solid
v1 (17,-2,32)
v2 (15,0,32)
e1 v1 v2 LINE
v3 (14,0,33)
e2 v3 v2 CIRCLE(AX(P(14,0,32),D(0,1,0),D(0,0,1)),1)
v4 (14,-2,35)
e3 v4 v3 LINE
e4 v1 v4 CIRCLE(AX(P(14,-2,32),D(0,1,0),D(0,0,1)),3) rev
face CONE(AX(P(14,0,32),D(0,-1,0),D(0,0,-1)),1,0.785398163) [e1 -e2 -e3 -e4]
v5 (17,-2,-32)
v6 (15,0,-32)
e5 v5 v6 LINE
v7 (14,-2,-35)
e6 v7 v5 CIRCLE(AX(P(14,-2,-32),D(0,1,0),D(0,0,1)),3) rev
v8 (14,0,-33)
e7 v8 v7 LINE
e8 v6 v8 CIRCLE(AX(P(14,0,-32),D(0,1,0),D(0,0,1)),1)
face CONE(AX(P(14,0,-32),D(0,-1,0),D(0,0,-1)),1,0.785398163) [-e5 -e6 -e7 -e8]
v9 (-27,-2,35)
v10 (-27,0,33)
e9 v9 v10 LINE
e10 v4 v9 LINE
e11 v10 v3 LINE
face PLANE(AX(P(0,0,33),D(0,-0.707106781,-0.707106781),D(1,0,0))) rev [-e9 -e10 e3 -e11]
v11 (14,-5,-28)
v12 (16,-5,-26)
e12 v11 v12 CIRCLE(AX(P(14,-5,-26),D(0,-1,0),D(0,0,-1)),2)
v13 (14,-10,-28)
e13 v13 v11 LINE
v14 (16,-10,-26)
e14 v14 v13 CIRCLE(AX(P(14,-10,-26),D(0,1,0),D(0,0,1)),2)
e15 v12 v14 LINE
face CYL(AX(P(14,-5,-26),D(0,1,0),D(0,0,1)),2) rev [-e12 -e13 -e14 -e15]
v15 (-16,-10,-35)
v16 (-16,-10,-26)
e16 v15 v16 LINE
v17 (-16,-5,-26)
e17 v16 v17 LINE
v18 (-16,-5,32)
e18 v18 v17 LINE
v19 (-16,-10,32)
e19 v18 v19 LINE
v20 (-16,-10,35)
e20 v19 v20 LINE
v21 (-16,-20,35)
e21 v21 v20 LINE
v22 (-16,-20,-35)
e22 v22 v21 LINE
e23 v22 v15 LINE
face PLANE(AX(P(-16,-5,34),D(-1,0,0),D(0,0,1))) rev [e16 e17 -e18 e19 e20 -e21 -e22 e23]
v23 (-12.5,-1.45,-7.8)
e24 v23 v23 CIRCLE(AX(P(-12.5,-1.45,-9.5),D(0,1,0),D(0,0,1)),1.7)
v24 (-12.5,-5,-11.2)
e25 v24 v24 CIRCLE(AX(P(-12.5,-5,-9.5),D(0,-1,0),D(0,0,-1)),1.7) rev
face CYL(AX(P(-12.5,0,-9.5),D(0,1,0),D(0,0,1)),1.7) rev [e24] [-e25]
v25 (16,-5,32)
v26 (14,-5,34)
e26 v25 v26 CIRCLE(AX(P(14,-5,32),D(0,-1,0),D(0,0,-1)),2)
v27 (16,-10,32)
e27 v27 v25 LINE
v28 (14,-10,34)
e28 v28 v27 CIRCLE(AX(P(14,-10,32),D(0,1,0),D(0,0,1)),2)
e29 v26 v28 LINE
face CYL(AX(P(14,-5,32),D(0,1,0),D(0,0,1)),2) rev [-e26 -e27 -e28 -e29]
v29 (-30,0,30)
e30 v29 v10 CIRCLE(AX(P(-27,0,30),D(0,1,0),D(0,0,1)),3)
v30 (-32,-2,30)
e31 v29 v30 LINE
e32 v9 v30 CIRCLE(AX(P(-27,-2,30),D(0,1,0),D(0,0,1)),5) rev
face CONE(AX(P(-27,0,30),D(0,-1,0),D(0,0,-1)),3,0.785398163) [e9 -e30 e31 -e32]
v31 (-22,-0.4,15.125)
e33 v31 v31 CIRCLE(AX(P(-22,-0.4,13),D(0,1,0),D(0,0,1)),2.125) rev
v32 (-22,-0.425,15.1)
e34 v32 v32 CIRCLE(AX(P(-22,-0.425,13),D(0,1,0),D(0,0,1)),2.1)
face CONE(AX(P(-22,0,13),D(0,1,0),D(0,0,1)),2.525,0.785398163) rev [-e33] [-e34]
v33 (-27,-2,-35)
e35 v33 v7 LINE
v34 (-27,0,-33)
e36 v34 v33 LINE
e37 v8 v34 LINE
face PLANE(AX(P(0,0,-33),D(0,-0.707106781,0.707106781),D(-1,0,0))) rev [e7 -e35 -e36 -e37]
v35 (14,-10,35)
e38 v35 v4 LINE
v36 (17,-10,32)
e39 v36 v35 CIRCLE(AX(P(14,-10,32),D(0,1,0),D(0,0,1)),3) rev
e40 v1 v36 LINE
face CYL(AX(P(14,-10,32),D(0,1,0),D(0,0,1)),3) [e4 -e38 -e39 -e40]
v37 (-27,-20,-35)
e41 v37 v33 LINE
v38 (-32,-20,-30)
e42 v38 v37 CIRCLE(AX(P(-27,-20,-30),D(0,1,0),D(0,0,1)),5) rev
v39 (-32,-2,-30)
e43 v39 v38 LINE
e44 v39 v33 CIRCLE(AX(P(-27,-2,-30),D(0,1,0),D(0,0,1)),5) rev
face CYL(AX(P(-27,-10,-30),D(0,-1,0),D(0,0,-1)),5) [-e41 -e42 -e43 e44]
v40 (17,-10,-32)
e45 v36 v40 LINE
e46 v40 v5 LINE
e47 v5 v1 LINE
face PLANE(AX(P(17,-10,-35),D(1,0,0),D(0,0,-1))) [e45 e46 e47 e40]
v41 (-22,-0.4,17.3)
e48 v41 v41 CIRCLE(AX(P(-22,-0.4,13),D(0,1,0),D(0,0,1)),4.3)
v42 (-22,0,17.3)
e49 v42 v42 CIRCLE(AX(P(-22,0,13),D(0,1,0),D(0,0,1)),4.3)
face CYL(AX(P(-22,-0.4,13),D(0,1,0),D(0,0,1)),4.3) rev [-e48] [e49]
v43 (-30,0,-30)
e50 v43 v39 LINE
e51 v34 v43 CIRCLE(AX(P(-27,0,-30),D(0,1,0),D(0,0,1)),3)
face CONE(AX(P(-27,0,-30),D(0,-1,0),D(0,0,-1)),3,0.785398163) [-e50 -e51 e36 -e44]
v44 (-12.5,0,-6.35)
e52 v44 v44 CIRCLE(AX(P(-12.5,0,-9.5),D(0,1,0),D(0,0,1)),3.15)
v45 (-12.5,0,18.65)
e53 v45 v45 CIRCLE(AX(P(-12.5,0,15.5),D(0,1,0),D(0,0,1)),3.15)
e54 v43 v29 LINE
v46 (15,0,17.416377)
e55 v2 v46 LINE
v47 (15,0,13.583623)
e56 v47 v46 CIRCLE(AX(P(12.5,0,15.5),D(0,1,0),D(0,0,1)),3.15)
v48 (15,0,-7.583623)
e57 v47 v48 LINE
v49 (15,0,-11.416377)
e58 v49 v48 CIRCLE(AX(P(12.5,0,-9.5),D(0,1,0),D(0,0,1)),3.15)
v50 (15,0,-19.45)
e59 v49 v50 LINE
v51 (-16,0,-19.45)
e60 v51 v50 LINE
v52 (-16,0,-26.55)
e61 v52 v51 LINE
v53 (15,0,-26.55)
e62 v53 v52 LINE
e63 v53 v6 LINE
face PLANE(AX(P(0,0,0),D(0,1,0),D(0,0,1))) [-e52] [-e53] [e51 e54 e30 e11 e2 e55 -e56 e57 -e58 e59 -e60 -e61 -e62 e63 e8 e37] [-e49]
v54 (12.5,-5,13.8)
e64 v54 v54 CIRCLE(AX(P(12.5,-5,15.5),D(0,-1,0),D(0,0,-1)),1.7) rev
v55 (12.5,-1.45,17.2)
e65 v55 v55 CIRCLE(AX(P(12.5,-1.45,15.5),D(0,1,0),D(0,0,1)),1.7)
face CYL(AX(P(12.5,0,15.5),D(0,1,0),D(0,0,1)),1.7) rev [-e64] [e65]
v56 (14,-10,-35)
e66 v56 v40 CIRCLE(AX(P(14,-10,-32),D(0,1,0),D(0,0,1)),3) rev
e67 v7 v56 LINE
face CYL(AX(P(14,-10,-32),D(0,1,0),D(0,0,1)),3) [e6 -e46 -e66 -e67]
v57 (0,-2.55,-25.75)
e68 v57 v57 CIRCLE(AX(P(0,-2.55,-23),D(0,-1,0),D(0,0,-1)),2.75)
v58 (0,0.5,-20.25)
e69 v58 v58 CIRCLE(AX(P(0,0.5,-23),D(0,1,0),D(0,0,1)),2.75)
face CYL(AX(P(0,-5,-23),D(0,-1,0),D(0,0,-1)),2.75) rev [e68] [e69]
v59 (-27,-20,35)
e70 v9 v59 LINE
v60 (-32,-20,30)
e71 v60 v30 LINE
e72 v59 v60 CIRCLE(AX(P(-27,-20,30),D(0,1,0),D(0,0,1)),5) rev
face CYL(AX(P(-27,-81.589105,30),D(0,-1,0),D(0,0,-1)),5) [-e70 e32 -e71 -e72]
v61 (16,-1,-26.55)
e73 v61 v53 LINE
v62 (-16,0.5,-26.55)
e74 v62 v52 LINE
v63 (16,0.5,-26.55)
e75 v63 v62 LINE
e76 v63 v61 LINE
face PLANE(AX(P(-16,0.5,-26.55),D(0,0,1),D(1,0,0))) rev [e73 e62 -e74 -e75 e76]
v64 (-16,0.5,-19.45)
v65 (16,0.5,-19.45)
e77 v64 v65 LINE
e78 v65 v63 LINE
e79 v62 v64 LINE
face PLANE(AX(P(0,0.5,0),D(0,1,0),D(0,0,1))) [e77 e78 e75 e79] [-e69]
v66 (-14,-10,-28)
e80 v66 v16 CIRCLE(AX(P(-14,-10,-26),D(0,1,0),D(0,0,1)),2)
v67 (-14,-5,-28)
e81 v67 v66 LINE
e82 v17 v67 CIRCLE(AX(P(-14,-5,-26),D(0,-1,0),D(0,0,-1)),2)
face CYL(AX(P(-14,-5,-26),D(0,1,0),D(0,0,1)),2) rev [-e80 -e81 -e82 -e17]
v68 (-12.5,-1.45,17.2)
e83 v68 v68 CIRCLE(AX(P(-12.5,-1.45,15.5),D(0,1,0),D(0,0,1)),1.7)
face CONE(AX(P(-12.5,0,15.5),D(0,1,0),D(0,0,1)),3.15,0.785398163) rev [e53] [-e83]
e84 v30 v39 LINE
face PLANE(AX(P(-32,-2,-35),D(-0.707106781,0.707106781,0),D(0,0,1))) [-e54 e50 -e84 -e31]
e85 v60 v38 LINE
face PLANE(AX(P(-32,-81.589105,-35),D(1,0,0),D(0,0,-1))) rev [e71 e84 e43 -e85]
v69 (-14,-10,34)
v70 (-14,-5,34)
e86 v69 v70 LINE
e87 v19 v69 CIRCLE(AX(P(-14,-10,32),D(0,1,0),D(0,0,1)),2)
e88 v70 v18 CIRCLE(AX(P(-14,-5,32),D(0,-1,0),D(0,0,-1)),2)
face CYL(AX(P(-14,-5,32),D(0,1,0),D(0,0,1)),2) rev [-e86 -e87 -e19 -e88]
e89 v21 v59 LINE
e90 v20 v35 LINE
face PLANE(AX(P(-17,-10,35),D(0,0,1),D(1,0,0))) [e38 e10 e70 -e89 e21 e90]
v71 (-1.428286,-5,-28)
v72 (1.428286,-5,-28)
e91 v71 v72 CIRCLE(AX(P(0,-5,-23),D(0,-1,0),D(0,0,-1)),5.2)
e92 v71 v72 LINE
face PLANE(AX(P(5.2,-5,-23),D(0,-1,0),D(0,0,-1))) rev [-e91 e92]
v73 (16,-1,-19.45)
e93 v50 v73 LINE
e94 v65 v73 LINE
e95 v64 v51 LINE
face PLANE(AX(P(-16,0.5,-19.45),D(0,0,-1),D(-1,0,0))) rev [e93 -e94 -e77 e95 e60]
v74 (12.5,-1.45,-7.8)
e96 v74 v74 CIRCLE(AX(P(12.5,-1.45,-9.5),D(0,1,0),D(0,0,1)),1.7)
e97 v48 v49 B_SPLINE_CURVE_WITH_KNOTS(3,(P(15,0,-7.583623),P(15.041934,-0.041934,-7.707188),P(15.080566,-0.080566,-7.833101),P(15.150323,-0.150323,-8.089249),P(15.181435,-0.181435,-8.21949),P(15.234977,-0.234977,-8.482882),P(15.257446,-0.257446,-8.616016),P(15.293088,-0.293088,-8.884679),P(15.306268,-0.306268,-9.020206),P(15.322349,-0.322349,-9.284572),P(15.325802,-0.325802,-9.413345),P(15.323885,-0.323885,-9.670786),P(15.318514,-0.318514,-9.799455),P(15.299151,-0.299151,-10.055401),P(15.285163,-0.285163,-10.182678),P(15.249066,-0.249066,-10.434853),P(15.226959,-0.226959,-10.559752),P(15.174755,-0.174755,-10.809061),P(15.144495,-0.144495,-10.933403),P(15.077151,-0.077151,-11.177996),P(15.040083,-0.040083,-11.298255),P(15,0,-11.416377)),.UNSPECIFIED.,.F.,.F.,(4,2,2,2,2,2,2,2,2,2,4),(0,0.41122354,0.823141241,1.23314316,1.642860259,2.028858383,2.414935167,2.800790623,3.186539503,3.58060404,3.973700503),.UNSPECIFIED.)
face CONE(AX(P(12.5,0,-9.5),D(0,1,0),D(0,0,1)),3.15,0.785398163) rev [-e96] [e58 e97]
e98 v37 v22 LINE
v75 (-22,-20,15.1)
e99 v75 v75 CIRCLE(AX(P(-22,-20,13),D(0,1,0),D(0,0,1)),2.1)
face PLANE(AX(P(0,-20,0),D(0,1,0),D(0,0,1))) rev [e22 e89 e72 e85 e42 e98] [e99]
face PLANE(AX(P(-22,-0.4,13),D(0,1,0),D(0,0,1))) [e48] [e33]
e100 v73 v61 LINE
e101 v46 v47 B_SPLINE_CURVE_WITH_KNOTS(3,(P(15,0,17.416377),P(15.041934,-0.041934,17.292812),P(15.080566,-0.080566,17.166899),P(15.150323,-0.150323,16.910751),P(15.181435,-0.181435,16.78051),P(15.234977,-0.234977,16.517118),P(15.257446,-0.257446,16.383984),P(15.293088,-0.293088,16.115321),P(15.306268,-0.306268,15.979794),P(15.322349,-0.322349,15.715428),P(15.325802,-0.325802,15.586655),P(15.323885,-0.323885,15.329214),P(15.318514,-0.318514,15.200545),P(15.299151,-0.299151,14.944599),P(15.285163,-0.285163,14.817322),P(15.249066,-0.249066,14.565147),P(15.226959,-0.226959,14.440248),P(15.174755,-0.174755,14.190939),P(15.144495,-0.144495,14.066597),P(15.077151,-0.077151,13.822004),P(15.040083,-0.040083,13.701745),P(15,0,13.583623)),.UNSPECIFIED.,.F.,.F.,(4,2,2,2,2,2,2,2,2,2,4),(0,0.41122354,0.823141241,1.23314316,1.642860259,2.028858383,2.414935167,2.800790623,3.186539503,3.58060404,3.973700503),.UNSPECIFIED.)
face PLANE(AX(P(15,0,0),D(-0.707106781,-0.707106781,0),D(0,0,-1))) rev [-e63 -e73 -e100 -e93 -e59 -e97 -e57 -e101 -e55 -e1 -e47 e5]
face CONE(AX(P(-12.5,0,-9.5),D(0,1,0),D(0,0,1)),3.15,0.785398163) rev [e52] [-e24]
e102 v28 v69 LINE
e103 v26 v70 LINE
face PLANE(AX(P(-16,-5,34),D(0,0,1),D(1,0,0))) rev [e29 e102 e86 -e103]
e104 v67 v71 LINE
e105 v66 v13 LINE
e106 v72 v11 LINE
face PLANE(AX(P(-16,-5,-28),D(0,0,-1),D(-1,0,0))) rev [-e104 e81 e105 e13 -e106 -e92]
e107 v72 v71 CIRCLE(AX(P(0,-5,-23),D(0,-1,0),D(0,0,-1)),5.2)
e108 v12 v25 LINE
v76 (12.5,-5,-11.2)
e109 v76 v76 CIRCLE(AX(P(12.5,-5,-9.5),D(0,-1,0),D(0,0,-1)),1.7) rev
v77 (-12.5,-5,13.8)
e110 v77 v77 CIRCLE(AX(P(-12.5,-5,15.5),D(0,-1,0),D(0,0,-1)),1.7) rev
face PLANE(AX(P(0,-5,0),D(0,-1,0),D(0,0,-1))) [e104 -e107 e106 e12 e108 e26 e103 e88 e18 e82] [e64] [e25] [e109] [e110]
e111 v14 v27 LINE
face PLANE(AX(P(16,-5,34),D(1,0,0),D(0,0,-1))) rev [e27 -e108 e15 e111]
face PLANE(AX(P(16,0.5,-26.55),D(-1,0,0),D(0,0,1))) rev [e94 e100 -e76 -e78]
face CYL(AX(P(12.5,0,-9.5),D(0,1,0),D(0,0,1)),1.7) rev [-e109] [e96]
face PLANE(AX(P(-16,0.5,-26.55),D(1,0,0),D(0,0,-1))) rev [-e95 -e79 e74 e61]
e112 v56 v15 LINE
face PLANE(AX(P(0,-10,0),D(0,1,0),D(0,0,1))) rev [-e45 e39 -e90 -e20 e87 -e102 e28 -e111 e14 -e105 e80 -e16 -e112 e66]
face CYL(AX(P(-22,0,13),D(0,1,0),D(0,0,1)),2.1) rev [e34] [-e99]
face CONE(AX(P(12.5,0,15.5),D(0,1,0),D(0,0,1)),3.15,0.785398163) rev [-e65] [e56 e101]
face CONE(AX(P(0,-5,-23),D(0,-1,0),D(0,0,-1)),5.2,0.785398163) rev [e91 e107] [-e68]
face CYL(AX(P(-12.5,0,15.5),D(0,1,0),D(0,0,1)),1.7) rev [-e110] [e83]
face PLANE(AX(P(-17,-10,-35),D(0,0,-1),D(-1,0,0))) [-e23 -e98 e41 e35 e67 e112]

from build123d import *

# Parameters (mm, degrees)
SKETCH_1_W                   = 34
SKETCH_1_H                   = 70
EXTRUDE_317_DEPTH            = 10
SKETCH_7_W                   = 15
SKETCH_7_H                   = 70
EXTRUDE_2_DEPTH              = 10
HOLE_WIZARD_M3_D             = 3.4
HOLE_WIZARD_M3_CSINK_D       = 6.3
HOLE_WIZARD_M3_CSINK_ANGLE   = 90
SKETCH_19_W                  = 32
SKETCH_19_H                  = 62
CUT_EXTRUDE_2_DEPTH          = 5
SKETCH_17_W                  = 32
SKETCH_17_H                  = 7.1
EXTRUDE_2650_DEPTH           = 0.5
SKETCH_20_W                  = 16
SKETCH_20_H                  = 70
EXTRUDE_1_DEPTH              = 10
HOLE_WIZARD_M5_2_D           = 4.2
HOLE_WIZARD_M5_2_CSINK_D     = 5.05
HOLE_WIZARD_M5_2_CSINK_ANGLE = 90
FILLET_1_R                   = 3
FILLET_3_R                   = 5
SKETCH_18_R                  = 4.3
CUT_EXTRUDE_1_DEPTH          = 0.4
FILLET_2_R                   = 2
CHAMFER_2_SIZE               = 2


with BuildPart() as part:
    # Эскиз1 → Extrude 317 (new body)
    with BuildSketch(Plane(origin=(0, 0, 0), x_dir=(1, 0, 0), z_dir=(0, 1, 0))):
        Rectangle(SKETCH_1_W, SKETCH_1_H)
    extrude(amount=-EXTRUDE_317_DEPTH)

    # Эскиз7 → База2 (add)
    with BuildSketch(Plane(origin=(0, 0, 0), x_dir=(-1, 0, 0), z_dir=(0, -1, 0))):
        with Locations((24.5, 0)):
            Rectangle(SKETCH_7_W, SKETCH_7_H)
    extrude(amount=EXTRUDE_2_DEPTH)

    # Крепление каретки M3 (through all)
    with Locations(Plane(origin=(0, 0, 0), x_dir=(-1, 0, 0), z_dir=(0, 1, 0))):
        with Locations((-12.5, -9.5), (12.5, -9.5), (12.5, 15.5), (-12.5, 15.5)):
            CounterSinkHole(HOLE_WIZARD_M3_D / 2, HOLE_WIZARD_M3_CSINK_D / 2, counter_sink_angle=HOLE_WIZARD_M3_CSINK_ANGLE)

    # Эскиз19 → Вырез-Вытянуть2 (cut)
    with BuildSketch(Plane.XZ.offset(10)):
        with Locations((0, 3)):
            Rectangle(SKETCH_19_W, SKETCH_19_H)
    extrude(amount=-CUT_EXTRUDE_2_DEPTH, mode=Mode.SUBTRACT)

    # Эскиз17 → Extrude 2650 (add)
    with BuildSketch(Plane(origin=(0, 0, 0), x_dir=(1, 0, 0), z_dir=(0, 1, 0))):
        with Locations((0, 23)):
            Rectangle(SKETCH_17_W, SKETCH_17_H)
    extrude(amount=EXTRUDE_2650_DEPTH)

    # Эскиз16 → Hole Wizard M5 (revolve, cut)
    with BuildSketch(Plane(origin=(0, -5, -23), x_dir=(0, 0, -1), z_dir=(1, 0, 0))):
        Polygon((0, 0), (0, 23.152366702), (2.75, 21.5), (2.75, 2.45), (5.2, 0), align=None)
    revolve(axis=Axis((0, -11.35, -23), (0, 1, 0)), mode=Mode.SUBTRACT)

    # Эскиз20 → Бобышка-Вытянуть1 (add)
    with BuildSketch(Plane.XZ.offset(10)):
        with Locations((-24, 0)):
            Rectangle(SKETCH_20_W, SKETCH_20_H)
    extrude(amount=EXTRUDE_1_DEPTH)

    # Hole Wizard M5 2 (through all)
    with Locations(Plane(origin=(0, 0, 0), x_dir=(-1, 0, 0), z_dir=(0, 1, 0))):
        with Locations((22, 13)):
            CounterSinkHole(HOLE_WIZARD_M5_2_D / 2, HOLE_WIZARD_M5_2_CSINK_D / 2, counter_sink_angle=HOLE_WIZARD_M5_2_CSINK_ANGLE)

    # Скругление1
    fillet_1_edges = [part.edges().sort_by_distance(p)[0] for p in [
        (17, -5, 35),
        (17, -5, -35),
    ]]
    fillet(fillet_1_edges, radius=FILLET_1_R)

    # Скругление3
    fillet_3_edges = [part.edges().sort_by_distance(p)[0] for p in [
        (-32, -10, -35),
        (-32, -10, 35),
    ]]
    fillet(fillet_3_edges, radius=FILLET_3_R)

    # Эскиз18 → Вырез-Вытянуть1 (cut)
    with BuildSketch(Plane(origin=(0, 0, 0), x_dir=(1, 0, 0), z_dir=(0, 1, 0))):
        with Locations(Location((-22, -13, 0), (0, 0, 270))):
            Circle(SKETCH_18_R)
    extrude(amount=-CUT_EXTRUDE_1_DEPTH, mode=Mode.SUBTRACT)

    # Скругление2
    fillet_2_edges = [part.edges().sort_by_distance(p)[0] for p in [
        (16, -7.5, 34),
        (16, -7.5, -28),
        (-16, -7.5, -28),
        (-16, -7.5, 34),
    ]]
    fillet(fillet_2_edges, radius=FILLET_2_R)

    # Фаска2
    # the kernel refuses this chamfer: 2 mm, written as the material it takes off along each edge
    with BuildSketch(Plane(origin=(14, 0, 32), x_dir=(0, 0, 1), z_dir=(-1, 0, 0))) as chamfer_2_piece_1:
        Polygon((3 - CHAMFER_2_SIZE, 0), (3, -CHAMFER_2_SIZE), (3, 0), align=None)
    revolve(axis=Axis((14, 0, 32), (0, 1, 0)), revolution_arc=90, mode=Mode.SUBTRACT)
    with BuildSketch(Plane(origin=(17, 0, -32), x_dir=(-0.9996219169112968, 0.027495876610586365, 0), z_dir=(0, 0, 1))) as chamfer_2_piece_2_section:
        Polygon((CHAMFER_2_SIZE * 0.999621916911, CHAMFER_2_SIZE * 0.0274958766106), (-CHAMFER_2_SIZE * 0.0274958766106, CHAMFER_2_SIZE * 0.999621916911), (0, 0), align=None)
    chamfer_2_piece_2 = extrude(amount=64, mode=Mode.PRIVATE)
    chamfer_2_piece_2 = split(chamfer_2_piece_2, bisect_by=Plane(origin=(15.636280777, -0.291141314, -26.55), z_dir=(0, 0, -1)), keep=Keep.TOP, mode=Mode.PRIVATE)
    chamfer_2_piece_2 = split(chamfer_2_piece_2, bisect_by=Plane(origin=(16, -0.291141314, -29.275), z_dir=(-1, 0, 0)), keep=Keep.TOP, mode=Mode.PRIVATE)
    add(chamfer_2_piece_2, mode=Mode.SUBTRACT)
    with BuildSketch(Plane(origin=(17, 0, -32), x_dir=(-0.9996219169112968, 0.027495876610586365, 0), z_dir=(0, 0, 1))) as chamfer_2_piece_3_section:
        Polygon((CHAMFER_2_SIZE * 0.999621916911, CHAMFER_2_SIZE * 0.0274958766106), (-CHAMFER_2_SIZE * 0.0274958766106, CHAMFER_2_SIZE * 0.999621916911), (0, 0), align=None)
    chamfer_2_piece_3 = extrude(amount=64, mode=Mode.PRIVATE)
    chamfer_2_piece_3 = split(chamfer_2_piece_3, bisect_by=Plane(origin=(16.58353142, -0.786802168, -26.55), z_dir=(0, 0, -1)), keep=Keep.TOP, mode=Mode.PRIVATE)
    chamfer_2_piece_3 = split(chamfer_2_piece_3, bisect_by=Plane(origin=(16, -0.786802168, -29.275), z_dir=(1, 0, 0)), keep=Keep.TOP, mode=Mode.PRIVATE)
    add(chamfer_2_piece_3, mode=Mode.SUBTRACT)
    with BuildSketch(Plane(origin=(17, 0, -32), x_dir=(-0.9996219169112968, 0.027495876610586365, 0), z_dir=(0, 0, 1))) as chamfer_2_piece_4_section:
        Polygon((CHAMFER_2_SIZE * 0.999621916911, CHAMFER_2_SIZE * 0.0274958766106), (-CHAMFER_2_SIZE * 0.0274958766106, CHAMFER_2_SIZE * 0.999621916911), (0, 0), align=None)
    chamfer_2_piece_4 = extrude(amount=64, mode=Mode.PRIVATE)
    chamfer_2_piece_4 = split(chamfer_2_piece_4, bisect_by=Plane(origin=(16.58353142, -0.786802168, -26.55), z_dir=(0, 0, 1)), keep=Keep.TOP, mode=Mode.PRIVATE)
    chamfer_2_piece_4 = split(chamfer_2_piece_4, bisect_by=Plane(origin=(16, -0.786802168, -23), z_dir=(1, 0, 0)), keep=Keep.TOP, mode=Mode.PRIVATE)
    chamfer_2_piece_4 = split(chamfer_2_piece_4, bisect_by=Plane(origin=(16.58353142, -0.786802168, -19.45), z_dir=(0, 0, -1)), keep=Keep.TOP, mode=Mode.PRIVATE)
    add(chamfer_2_piece_4, mode=Mode.SUBTRACT)
    with BuildSketch(Plane(origin=(17, 0, -32), x_dir=(-0.9996219169112968, 0.027495876610586365, 0), z_dir=(0, 0, 1))) as chamfer_2_piece_5_section:
        Polygon((CHAMFER_2_SIZE * 0.999621916911, CHAMFER_2_SIZE * 0.0274958766106), (-CHAMFER_2_SIZE * 0.0274958766106, CHAMFER_2_SIZE * 0.999621916911), (0, 0), align=None)
    chamfer_2_piece_5 = extrude(amount=64, mode=Mode.PRIVATE)
    chamfer_2_piece_5 = split(chamfer_2_piece_5, bisect_by=Plane(origin=(16, -0.291141314, 6.275), z_dir=(-1, 0, 0)), keep=Keep.TOP, mode=Mode.PRIVATE)
    chamfer_2_piece_5 = split(chamfer_2_piece_5, bisect_by=Plane(origin=(15.636280777, -0.291141314, -19.45), z_dir=(0, 0, 1)), keep=Keep.TOP, mode=Mode.PRIVATE)
    add(chamfer_2_piece_5, mode=Mode.SUBTRACT)
    with BuildSketch(Plane(origin=(17, 0, -32), x_dir=(-0.9996219169112968, 0.027495876610586365, 0), z_dir=(0, 0, 1))) as chamfer_2_piece_6_section:
        Polygon((CHAMFER_2_SIZE * 0.999621916911, CHAMFER_2_SIZE * 0.0274958766106), (-CHAMFER_2_SIZE * 0.0274958766106, CHAMFER_2_SIZE * 0.999621916911), (0, 0), align=None)
    chamfer_2_piece_6 = extrude(amount=64, mode=Mode.PRIVATE)
    chamfer_2_piece_6 = split(chamfer_2_piece_6, bisect_by=Plane(origin=(16, -0.786802168, 6.275), z_dir=(1, 0, 0)), keep=Keep.TOP, mode=Mode.PRIVATE)
    chamfer_2_piece_6 = split(chamfer_2_piece_6, bisect_by=Plane(origin=(16.58353142, -0.786802168, -19.45), z_dir=(0, 0, 1)), keep=Keep.TOP, mode=Mode.PRIVATE)
    add(chamfer_2_piece_6, mode=Mode.SUBTRACT)
    with BuildSketch(Plane(origin=(14, 0, -32), x_dir=(0, 0, -1), z_dir=(-1, 0, 0))) as chamfer_2_piece_7:
        Polygon((3 - CHAMFER_2_SIZE, 0), (3, CHAMFER_2_SIZE), (3, 0), align=None)
    revolve(axis=Axis((14, 0, -32), (0, -1, 0)), revolution_arc=90, mode=Mode.SUBTRACT)
    with BuildSketch(Plane(origin=(-27, 0, -35), x_dir=(0, 0.02749587661058639, 0.9996219169112968), z_dir=(1, 0, 0))) as chamfer_2_piece_8:
        Polygon((CHAMFER_2_SIZE * 0.999621916911, CHAMFER_2_SIZE * 0.0274958766106), (-CHAMFER_2_SIZE * 0.0274958766106, CHAMFER_2_SIZE * 0.999621916911), (0, 0), align=None)
    extrude(amount=41, mode=Mode.SUBTRACT)
    with BuildSketch(Plane(origin=(-32, 0, -30), x_dir=(0.9996219169112968, 0.02749587661058639, 0), z_dir=(0, 0, 1))) as chamfer_2_piece_9:
        Polygon((CHAMFER_2_SIZE * 0.999621916911, -CHAMFER_2_SIZE * 0.0274958766106), (-CHAMFER_2_SIZE * 0.0274958766106, -CHAMFER_2_SIZE * 0.999621916911), (0, 0), align=None)
    extrude(amount=60, mode=Mode.SUBTRACT)
    with BuildSketch(Plane(origin=(-27, 0, 35), x_dir=(0, 0.027495876610586296, -0.9996219169112968), z_dir=(1, 0, 0))) as chamfer_2_piece_10:
        Polygon((CHAMFER_2_SIZE * 0.999621916911, -CHAMFER_2_SIZE * 0.0274958766106), (-CHAMFER_2_SIZE * 0.0274958766106, -CHAMFER_2_SIZE * 0.999621916911), (0, 0), align=None)
    extrude(amount=41, mode=Mode.SUBTRACT)
    with BuildSketch(Plane(origin=(-27, 0, -30), x_dir=(0, 0, -1), z_dir=(1, 0, 0))) as chamfer_2_piece_11:
        Polygon((5 - CHAMFER_2_SIZE, 0), (5, -CHAMFER_2_SIZE), (5, 0), align=None)
    revolve(axis=Axis((-27, 0, -30), (0, 1, 0)), revolution_arc=90, mode=Mode.SUBTRACT)
    with BuildSketch(Plane(origin=(-27, 0, 30), x_dir=(-1, 0, 0), z_dir=(0, 0, -1))) as chamfer_2_piece_12:
        Polygon((5 - CHAMFER_2_SIZE, 0), (5, -CHAMFER_2_SIZE), (5, 0), align=None)
    revolve(axis=Axis((-27, 0, 30), (0, 1, 0)), revolution_arc=90, mode=Mode.SUBTRACT)


solid = part.part
